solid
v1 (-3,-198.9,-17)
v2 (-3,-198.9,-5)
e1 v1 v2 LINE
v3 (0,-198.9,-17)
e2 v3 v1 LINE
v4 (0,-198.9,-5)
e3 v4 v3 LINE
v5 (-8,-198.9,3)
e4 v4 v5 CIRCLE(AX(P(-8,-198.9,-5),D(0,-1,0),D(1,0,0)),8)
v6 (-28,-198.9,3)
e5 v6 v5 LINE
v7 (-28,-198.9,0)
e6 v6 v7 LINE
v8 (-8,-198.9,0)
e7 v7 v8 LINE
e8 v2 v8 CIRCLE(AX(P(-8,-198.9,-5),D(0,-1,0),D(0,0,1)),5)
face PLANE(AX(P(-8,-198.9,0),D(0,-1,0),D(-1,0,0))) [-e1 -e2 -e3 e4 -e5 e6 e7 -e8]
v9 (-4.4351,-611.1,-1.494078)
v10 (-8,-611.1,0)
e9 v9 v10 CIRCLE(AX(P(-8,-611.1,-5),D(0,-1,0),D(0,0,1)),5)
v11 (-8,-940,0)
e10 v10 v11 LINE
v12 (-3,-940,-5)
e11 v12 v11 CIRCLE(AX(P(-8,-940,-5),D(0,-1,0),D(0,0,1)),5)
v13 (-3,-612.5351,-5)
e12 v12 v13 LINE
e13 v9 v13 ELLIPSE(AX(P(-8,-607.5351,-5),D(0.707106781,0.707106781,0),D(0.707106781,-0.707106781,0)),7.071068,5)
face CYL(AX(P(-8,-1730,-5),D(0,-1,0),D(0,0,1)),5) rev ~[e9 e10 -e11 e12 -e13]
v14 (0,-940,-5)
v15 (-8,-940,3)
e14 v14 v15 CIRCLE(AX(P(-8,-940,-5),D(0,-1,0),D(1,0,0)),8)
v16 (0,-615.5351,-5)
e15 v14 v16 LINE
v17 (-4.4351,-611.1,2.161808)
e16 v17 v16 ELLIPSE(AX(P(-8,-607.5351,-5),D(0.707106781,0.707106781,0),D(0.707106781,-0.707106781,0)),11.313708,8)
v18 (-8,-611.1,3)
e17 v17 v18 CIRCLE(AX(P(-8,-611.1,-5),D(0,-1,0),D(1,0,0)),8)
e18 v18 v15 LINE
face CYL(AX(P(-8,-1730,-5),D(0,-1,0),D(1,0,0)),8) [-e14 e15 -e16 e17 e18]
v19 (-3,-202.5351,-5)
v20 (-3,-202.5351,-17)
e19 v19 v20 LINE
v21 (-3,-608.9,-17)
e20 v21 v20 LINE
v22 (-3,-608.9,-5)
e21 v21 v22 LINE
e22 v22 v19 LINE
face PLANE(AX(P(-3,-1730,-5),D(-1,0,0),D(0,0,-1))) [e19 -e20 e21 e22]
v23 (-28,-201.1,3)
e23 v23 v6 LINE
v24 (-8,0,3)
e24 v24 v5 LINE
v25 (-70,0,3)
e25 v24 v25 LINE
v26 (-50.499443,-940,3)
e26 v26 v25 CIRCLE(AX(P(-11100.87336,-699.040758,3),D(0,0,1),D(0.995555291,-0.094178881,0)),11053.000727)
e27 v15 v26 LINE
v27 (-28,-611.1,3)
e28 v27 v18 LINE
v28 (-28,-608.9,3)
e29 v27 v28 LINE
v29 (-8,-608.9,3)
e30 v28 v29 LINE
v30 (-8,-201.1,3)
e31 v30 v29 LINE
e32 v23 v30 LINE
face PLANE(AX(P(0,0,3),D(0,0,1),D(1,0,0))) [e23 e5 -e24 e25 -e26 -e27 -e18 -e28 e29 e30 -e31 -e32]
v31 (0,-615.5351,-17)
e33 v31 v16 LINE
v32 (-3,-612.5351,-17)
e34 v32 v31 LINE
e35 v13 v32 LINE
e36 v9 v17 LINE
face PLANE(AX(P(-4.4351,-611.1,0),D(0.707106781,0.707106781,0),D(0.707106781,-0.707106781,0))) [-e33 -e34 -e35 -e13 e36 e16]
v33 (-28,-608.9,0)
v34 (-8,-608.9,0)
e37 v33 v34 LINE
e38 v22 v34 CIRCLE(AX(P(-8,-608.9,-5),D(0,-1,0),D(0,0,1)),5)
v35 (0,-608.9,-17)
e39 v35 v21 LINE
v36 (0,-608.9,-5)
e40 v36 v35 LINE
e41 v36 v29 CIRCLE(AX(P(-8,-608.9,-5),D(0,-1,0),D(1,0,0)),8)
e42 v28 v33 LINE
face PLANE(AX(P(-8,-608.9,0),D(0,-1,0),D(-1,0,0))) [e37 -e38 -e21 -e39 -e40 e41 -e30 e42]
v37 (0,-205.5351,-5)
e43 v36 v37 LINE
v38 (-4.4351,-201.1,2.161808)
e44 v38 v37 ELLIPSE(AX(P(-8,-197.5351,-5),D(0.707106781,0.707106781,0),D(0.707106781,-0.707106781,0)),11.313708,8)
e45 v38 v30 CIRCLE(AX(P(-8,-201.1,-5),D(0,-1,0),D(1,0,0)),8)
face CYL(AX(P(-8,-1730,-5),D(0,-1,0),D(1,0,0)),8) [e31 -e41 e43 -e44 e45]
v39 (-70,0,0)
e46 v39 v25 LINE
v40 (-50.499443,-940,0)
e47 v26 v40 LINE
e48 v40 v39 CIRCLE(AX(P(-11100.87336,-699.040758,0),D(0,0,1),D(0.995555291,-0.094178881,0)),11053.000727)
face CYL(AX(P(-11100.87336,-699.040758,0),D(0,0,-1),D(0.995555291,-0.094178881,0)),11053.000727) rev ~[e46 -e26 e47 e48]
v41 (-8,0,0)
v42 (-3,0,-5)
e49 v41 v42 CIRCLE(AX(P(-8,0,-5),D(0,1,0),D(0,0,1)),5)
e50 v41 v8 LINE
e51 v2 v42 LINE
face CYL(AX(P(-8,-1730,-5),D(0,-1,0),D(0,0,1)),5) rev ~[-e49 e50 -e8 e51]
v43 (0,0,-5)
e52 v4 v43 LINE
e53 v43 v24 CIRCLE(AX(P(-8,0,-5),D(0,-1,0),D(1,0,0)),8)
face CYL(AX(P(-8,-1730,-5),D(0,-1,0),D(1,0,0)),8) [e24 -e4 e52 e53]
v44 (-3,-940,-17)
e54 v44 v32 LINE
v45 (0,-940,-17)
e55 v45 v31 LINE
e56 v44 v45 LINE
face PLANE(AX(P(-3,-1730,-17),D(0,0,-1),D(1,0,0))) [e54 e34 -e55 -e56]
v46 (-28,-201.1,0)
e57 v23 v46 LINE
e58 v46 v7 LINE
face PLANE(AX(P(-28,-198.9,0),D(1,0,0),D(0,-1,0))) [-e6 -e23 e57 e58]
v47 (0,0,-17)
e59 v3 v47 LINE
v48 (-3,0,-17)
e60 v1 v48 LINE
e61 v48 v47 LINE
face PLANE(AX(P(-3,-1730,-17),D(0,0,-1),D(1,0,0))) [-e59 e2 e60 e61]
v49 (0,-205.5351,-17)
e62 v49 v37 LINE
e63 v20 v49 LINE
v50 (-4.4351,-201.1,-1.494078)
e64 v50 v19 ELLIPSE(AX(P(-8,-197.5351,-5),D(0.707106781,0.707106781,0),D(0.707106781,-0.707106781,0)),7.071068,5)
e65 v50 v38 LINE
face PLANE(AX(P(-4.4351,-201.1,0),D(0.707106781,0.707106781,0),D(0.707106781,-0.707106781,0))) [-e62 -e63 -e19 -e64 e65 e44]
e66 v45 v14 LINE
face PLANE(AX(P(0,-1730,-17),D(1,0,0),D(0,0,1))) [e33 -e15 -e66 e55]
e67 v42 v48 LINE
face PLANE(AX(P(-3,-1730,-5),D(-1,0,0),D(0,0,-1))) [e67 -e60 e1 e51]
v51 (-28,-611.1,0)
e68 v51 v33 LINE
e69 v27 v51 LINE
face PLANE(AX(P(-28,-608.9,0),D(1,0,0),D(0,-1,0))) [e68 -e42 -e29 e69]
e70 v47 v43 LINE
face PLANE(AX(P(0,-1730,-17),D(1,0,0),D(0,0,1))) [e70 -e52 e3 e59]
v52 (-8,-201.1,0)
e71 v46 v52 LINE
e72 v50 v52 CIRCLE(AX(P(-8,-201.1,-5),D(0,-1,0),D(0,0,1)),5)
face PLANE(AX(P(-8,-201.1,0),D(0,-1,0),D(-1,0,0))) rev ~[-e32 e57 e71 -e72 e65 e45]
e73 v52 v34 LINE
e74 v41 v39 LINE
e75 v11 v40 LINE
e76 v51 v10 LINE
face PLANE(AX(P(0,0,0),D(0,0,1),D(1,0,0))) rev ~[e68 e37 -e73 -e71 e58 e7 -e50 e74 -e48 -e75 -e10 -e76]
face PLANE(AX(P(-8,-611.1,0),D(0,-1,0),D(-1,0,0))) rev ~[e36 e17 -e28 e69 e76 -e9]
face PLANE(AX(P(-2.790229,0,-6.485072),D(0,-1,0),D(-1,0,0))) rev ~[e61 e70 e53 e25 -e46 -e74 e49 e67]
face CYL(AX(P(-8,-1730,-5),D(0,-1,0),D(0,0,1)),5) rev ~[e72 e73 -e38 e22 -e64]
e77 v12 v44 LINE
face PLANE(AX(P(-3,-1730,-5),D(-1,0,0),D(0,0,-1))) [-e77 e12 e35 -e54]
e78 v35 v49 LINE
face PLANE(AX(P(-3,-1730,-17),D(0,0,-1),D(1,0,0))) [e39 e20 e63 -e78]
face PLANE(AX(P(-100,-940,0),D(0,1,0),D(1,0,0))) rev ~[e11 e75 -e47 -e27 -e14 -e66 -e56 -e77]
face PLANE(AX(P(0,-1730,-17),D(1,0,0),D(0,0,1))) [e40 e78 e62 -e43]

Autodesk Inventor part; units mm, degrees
ref_plane "YZ Plane" through (0, 0, 0) normal (1, 0, 0) x (0, 1, 0)
ref_plane "XZ Plane" through (0, 0, 0) normal (0, 1, 0) x (-1, 0, 0)
ref_plane "XY Plane" through (0, 0, 0) normal (0, 0, 1) x (1, 0, 0)
sketch "Sketch1" plane through (0, 0, 0) normal (0, 0, 1) x (1, 0, 0)
  arc A0 (-97, -1740) -> (-70, 0) centre (-11100.8726, -699.0408) ccw
  line L0 (0, 0) -> (-70, 0)
  line L1 (0, -16.732) -> (-68.9524, -16.732) construction
  line L2 (0, -496.732) -> (-49.7243, -496.732) construction
  line L3 (0, -976.732) -> (-51.3615, -976.732) construction
  line L4 (0, -1456.732) -> (-73.8734, -1456.732) construction
  line L5 (-97, -1740) -> (0, -1740)
  line L6 (0, 0) -> (0, -1740)
  line L7 (0, -1730) -> (-10.3553, -1740)
  point P0 (-20, 0)
  dimension "d33" = 50
  dimension "d58" = 480
  dimension "d59" = 480
  dimension "d60" = 480
  dimension "d141" = 1740
  dimension "d148" = 70
  dimension "d149" = 11053
  dimension "d150" = 97
  dimension "d151" = 136
  dimension "d153" = 10
extrude "Plate3" add sketch "Sketch1" along normal blind 3 contours A0 L0 L6 L7 L5
sketch "Sketch3" plane through (-3, 0, 3) normal (1, 0, 0) x (0, 1, 0)
  line L0 (-1730, 0) -> (0, 0)
  line L1 (0, 0) -> (0, 20)
  line L2 (0, 20) -> (-1730, 20)
  line L3 (-1730, 20) -> (-1730, 0)
edge flange "Flange2" height 20 angle 90 thickness 3 bend radius 5 thickness toward (1, 0, 0) relief round relief width 3 relief depth 1.5 edges at (0, -865, 3) wall of the first edge with corners at (-3, -1730, 3) (-3, 0, 3) (-3, 0, -17) (-3, -1730, -17)
bend "Bend2"
corner "Corner2"
sketch "Sketch5" plane through (0, 0, 0) normal (0, 0, 1) x (1, 0, 0)
  line L0 (-8, -1737.7255) -> (-8, 0) projected
  line L1 (-70, 0) -> (-8, 0) projected
  arc A0 (-97, -1740) -> (-70, 0) centre (-11100.8726, -699.0408) ccw projected
  line L2 (0, 0) -> (0, -1730) projected
  line L3 (0, -198.9) -> (-28, -198.9)
  line L4 (0, -201.1) -> (-3, -201.1)
  line L5 (-3, -1730) -> (-3, 0) projected
  line L6 (-28, -198.9) -> (-28, -201.1)
  line L7 (0, -608.9) -> (-48.2402, -608.9) construction
  line L8 (0, -1018.9) -> (-52.5018, -1018.9) construction
  line L9 (0, -1428.9) -> (-71.9962, -1428.9) construction
  line L10 (-10.3553, -1740) -> (-97, -1740) projected
  line L11 (0, -198.9) -> (0, -218.9)
  line L12 (-3, -198.9) -> (-3, -201.1) construction
  line L13 (0, -218.9) -> (-3, -218.9)
  line L14 (-28, -198.9) -> (-59.1939, -198.9) construction
  line L15 (-28, -201.1) -> (-59.0945, -201.1) construction
  line L16 (-3, -201.1) -> (-3, -218.9)
  line L17 (-3, -201.1) -> (-28, -201.1)
  line L18 (-3, -218.9) -> (-8, -218.9)
  line L19 (-8, -1737.7255) -> (-10.3553, -1740) projected
  line L20 (-4.4351, -201.1) -> (0, -205.5351)
  line L21 (-4.4351, -201.1) -> (1.8371, -201.1) construction
  line L22 (-10.3553, -1740) -> (-10.3553, -1770)
  point P0 (0, 0)
  point P1 (845.25, -380.4205)
  point P2 (848, -380.4205)
  point P3 (-28, -200)
  point P4 (850, -410.4205)
  point P5 (-3, -198.9)
  point P6 (-3, -218.9)
  point P7 (-8, -201.1)
  point P8 (0, -205.5351)
  dimension "d69" = 1730
  dimension "d70" = 2.2
  dimension "d76" = 59.1939
  dimension "d80" = 48.2402
  dimension "d102" = 71.9962
  dimension "d104" = 52.5018
  dimension "d106" = 3
  dimension "d107" = 20
  dimension "d108" = 200
  dimension "d112" = 28
  dimension "d142" = 410
  dimension "d143" = 410
  dimension "d144" = 410
  dimension "d154" = 45
  dimension "d155" = 30
  dimension "d156" = 341.1
extrude "Extrusion2" cut sketch "Sketch5" along normal through all both and the other way through all contours L17 L6 L3 L0 | L0 L3 L5 L17 | L17 L5 L20 | L5 L4 L2 L20 | L3 L2 L4 L5
pattern_linear "Rectangular Pattern3" count 4 spacing 410 along (0, -1, 0) of "Extrusion2"
sketch "Sketch7" plane through (0, 0, 0) normal (0, 0, 1) x (1, 0, 0)
  line L0 (0, 0) -> (0, -198.9) projected
  line L1 (0, 0) -> (-100, 0)
  line L2 (-100, 0) -> (-100, -940)
  line L3 (-100, -940) -> (0, -940)
  line L4 (0, -940) -> (0, 0)
  line L5 (-100, -1740) -> (0, -1740)
  line L6 (0, -1740) -> (0, -940)
  line L7 (0, -940) -> (-100, -940)
  line L8 (-100, -940) -> (-100, -1740)
  line L9 (-97, -1740) -> (-10.3553, -1740) projected
  point P0 (-50, -1740)
  dimension "d157" = 100
  dimension "d158" = 940
extrude "Extrusion3" cut sketch "Sketch7" along normal through all both and the other way through all contours L6 L5 L8 L3
equation "\"d33\" = d25"
equation "\"БОРТ_стрингер_3_высота\" = 59"
equation "\"БОРТ_стрингер_4_высота\" = 48"
equation "\"БОРТ_стрингер_5_высота\" = 53"
equation "\"БОРТ_стрингер_6_высота\" = 72"
equation "\"d25\" = 50"
properties part number "MSC 347 RIB BOARD" material "Stainless Steel"
